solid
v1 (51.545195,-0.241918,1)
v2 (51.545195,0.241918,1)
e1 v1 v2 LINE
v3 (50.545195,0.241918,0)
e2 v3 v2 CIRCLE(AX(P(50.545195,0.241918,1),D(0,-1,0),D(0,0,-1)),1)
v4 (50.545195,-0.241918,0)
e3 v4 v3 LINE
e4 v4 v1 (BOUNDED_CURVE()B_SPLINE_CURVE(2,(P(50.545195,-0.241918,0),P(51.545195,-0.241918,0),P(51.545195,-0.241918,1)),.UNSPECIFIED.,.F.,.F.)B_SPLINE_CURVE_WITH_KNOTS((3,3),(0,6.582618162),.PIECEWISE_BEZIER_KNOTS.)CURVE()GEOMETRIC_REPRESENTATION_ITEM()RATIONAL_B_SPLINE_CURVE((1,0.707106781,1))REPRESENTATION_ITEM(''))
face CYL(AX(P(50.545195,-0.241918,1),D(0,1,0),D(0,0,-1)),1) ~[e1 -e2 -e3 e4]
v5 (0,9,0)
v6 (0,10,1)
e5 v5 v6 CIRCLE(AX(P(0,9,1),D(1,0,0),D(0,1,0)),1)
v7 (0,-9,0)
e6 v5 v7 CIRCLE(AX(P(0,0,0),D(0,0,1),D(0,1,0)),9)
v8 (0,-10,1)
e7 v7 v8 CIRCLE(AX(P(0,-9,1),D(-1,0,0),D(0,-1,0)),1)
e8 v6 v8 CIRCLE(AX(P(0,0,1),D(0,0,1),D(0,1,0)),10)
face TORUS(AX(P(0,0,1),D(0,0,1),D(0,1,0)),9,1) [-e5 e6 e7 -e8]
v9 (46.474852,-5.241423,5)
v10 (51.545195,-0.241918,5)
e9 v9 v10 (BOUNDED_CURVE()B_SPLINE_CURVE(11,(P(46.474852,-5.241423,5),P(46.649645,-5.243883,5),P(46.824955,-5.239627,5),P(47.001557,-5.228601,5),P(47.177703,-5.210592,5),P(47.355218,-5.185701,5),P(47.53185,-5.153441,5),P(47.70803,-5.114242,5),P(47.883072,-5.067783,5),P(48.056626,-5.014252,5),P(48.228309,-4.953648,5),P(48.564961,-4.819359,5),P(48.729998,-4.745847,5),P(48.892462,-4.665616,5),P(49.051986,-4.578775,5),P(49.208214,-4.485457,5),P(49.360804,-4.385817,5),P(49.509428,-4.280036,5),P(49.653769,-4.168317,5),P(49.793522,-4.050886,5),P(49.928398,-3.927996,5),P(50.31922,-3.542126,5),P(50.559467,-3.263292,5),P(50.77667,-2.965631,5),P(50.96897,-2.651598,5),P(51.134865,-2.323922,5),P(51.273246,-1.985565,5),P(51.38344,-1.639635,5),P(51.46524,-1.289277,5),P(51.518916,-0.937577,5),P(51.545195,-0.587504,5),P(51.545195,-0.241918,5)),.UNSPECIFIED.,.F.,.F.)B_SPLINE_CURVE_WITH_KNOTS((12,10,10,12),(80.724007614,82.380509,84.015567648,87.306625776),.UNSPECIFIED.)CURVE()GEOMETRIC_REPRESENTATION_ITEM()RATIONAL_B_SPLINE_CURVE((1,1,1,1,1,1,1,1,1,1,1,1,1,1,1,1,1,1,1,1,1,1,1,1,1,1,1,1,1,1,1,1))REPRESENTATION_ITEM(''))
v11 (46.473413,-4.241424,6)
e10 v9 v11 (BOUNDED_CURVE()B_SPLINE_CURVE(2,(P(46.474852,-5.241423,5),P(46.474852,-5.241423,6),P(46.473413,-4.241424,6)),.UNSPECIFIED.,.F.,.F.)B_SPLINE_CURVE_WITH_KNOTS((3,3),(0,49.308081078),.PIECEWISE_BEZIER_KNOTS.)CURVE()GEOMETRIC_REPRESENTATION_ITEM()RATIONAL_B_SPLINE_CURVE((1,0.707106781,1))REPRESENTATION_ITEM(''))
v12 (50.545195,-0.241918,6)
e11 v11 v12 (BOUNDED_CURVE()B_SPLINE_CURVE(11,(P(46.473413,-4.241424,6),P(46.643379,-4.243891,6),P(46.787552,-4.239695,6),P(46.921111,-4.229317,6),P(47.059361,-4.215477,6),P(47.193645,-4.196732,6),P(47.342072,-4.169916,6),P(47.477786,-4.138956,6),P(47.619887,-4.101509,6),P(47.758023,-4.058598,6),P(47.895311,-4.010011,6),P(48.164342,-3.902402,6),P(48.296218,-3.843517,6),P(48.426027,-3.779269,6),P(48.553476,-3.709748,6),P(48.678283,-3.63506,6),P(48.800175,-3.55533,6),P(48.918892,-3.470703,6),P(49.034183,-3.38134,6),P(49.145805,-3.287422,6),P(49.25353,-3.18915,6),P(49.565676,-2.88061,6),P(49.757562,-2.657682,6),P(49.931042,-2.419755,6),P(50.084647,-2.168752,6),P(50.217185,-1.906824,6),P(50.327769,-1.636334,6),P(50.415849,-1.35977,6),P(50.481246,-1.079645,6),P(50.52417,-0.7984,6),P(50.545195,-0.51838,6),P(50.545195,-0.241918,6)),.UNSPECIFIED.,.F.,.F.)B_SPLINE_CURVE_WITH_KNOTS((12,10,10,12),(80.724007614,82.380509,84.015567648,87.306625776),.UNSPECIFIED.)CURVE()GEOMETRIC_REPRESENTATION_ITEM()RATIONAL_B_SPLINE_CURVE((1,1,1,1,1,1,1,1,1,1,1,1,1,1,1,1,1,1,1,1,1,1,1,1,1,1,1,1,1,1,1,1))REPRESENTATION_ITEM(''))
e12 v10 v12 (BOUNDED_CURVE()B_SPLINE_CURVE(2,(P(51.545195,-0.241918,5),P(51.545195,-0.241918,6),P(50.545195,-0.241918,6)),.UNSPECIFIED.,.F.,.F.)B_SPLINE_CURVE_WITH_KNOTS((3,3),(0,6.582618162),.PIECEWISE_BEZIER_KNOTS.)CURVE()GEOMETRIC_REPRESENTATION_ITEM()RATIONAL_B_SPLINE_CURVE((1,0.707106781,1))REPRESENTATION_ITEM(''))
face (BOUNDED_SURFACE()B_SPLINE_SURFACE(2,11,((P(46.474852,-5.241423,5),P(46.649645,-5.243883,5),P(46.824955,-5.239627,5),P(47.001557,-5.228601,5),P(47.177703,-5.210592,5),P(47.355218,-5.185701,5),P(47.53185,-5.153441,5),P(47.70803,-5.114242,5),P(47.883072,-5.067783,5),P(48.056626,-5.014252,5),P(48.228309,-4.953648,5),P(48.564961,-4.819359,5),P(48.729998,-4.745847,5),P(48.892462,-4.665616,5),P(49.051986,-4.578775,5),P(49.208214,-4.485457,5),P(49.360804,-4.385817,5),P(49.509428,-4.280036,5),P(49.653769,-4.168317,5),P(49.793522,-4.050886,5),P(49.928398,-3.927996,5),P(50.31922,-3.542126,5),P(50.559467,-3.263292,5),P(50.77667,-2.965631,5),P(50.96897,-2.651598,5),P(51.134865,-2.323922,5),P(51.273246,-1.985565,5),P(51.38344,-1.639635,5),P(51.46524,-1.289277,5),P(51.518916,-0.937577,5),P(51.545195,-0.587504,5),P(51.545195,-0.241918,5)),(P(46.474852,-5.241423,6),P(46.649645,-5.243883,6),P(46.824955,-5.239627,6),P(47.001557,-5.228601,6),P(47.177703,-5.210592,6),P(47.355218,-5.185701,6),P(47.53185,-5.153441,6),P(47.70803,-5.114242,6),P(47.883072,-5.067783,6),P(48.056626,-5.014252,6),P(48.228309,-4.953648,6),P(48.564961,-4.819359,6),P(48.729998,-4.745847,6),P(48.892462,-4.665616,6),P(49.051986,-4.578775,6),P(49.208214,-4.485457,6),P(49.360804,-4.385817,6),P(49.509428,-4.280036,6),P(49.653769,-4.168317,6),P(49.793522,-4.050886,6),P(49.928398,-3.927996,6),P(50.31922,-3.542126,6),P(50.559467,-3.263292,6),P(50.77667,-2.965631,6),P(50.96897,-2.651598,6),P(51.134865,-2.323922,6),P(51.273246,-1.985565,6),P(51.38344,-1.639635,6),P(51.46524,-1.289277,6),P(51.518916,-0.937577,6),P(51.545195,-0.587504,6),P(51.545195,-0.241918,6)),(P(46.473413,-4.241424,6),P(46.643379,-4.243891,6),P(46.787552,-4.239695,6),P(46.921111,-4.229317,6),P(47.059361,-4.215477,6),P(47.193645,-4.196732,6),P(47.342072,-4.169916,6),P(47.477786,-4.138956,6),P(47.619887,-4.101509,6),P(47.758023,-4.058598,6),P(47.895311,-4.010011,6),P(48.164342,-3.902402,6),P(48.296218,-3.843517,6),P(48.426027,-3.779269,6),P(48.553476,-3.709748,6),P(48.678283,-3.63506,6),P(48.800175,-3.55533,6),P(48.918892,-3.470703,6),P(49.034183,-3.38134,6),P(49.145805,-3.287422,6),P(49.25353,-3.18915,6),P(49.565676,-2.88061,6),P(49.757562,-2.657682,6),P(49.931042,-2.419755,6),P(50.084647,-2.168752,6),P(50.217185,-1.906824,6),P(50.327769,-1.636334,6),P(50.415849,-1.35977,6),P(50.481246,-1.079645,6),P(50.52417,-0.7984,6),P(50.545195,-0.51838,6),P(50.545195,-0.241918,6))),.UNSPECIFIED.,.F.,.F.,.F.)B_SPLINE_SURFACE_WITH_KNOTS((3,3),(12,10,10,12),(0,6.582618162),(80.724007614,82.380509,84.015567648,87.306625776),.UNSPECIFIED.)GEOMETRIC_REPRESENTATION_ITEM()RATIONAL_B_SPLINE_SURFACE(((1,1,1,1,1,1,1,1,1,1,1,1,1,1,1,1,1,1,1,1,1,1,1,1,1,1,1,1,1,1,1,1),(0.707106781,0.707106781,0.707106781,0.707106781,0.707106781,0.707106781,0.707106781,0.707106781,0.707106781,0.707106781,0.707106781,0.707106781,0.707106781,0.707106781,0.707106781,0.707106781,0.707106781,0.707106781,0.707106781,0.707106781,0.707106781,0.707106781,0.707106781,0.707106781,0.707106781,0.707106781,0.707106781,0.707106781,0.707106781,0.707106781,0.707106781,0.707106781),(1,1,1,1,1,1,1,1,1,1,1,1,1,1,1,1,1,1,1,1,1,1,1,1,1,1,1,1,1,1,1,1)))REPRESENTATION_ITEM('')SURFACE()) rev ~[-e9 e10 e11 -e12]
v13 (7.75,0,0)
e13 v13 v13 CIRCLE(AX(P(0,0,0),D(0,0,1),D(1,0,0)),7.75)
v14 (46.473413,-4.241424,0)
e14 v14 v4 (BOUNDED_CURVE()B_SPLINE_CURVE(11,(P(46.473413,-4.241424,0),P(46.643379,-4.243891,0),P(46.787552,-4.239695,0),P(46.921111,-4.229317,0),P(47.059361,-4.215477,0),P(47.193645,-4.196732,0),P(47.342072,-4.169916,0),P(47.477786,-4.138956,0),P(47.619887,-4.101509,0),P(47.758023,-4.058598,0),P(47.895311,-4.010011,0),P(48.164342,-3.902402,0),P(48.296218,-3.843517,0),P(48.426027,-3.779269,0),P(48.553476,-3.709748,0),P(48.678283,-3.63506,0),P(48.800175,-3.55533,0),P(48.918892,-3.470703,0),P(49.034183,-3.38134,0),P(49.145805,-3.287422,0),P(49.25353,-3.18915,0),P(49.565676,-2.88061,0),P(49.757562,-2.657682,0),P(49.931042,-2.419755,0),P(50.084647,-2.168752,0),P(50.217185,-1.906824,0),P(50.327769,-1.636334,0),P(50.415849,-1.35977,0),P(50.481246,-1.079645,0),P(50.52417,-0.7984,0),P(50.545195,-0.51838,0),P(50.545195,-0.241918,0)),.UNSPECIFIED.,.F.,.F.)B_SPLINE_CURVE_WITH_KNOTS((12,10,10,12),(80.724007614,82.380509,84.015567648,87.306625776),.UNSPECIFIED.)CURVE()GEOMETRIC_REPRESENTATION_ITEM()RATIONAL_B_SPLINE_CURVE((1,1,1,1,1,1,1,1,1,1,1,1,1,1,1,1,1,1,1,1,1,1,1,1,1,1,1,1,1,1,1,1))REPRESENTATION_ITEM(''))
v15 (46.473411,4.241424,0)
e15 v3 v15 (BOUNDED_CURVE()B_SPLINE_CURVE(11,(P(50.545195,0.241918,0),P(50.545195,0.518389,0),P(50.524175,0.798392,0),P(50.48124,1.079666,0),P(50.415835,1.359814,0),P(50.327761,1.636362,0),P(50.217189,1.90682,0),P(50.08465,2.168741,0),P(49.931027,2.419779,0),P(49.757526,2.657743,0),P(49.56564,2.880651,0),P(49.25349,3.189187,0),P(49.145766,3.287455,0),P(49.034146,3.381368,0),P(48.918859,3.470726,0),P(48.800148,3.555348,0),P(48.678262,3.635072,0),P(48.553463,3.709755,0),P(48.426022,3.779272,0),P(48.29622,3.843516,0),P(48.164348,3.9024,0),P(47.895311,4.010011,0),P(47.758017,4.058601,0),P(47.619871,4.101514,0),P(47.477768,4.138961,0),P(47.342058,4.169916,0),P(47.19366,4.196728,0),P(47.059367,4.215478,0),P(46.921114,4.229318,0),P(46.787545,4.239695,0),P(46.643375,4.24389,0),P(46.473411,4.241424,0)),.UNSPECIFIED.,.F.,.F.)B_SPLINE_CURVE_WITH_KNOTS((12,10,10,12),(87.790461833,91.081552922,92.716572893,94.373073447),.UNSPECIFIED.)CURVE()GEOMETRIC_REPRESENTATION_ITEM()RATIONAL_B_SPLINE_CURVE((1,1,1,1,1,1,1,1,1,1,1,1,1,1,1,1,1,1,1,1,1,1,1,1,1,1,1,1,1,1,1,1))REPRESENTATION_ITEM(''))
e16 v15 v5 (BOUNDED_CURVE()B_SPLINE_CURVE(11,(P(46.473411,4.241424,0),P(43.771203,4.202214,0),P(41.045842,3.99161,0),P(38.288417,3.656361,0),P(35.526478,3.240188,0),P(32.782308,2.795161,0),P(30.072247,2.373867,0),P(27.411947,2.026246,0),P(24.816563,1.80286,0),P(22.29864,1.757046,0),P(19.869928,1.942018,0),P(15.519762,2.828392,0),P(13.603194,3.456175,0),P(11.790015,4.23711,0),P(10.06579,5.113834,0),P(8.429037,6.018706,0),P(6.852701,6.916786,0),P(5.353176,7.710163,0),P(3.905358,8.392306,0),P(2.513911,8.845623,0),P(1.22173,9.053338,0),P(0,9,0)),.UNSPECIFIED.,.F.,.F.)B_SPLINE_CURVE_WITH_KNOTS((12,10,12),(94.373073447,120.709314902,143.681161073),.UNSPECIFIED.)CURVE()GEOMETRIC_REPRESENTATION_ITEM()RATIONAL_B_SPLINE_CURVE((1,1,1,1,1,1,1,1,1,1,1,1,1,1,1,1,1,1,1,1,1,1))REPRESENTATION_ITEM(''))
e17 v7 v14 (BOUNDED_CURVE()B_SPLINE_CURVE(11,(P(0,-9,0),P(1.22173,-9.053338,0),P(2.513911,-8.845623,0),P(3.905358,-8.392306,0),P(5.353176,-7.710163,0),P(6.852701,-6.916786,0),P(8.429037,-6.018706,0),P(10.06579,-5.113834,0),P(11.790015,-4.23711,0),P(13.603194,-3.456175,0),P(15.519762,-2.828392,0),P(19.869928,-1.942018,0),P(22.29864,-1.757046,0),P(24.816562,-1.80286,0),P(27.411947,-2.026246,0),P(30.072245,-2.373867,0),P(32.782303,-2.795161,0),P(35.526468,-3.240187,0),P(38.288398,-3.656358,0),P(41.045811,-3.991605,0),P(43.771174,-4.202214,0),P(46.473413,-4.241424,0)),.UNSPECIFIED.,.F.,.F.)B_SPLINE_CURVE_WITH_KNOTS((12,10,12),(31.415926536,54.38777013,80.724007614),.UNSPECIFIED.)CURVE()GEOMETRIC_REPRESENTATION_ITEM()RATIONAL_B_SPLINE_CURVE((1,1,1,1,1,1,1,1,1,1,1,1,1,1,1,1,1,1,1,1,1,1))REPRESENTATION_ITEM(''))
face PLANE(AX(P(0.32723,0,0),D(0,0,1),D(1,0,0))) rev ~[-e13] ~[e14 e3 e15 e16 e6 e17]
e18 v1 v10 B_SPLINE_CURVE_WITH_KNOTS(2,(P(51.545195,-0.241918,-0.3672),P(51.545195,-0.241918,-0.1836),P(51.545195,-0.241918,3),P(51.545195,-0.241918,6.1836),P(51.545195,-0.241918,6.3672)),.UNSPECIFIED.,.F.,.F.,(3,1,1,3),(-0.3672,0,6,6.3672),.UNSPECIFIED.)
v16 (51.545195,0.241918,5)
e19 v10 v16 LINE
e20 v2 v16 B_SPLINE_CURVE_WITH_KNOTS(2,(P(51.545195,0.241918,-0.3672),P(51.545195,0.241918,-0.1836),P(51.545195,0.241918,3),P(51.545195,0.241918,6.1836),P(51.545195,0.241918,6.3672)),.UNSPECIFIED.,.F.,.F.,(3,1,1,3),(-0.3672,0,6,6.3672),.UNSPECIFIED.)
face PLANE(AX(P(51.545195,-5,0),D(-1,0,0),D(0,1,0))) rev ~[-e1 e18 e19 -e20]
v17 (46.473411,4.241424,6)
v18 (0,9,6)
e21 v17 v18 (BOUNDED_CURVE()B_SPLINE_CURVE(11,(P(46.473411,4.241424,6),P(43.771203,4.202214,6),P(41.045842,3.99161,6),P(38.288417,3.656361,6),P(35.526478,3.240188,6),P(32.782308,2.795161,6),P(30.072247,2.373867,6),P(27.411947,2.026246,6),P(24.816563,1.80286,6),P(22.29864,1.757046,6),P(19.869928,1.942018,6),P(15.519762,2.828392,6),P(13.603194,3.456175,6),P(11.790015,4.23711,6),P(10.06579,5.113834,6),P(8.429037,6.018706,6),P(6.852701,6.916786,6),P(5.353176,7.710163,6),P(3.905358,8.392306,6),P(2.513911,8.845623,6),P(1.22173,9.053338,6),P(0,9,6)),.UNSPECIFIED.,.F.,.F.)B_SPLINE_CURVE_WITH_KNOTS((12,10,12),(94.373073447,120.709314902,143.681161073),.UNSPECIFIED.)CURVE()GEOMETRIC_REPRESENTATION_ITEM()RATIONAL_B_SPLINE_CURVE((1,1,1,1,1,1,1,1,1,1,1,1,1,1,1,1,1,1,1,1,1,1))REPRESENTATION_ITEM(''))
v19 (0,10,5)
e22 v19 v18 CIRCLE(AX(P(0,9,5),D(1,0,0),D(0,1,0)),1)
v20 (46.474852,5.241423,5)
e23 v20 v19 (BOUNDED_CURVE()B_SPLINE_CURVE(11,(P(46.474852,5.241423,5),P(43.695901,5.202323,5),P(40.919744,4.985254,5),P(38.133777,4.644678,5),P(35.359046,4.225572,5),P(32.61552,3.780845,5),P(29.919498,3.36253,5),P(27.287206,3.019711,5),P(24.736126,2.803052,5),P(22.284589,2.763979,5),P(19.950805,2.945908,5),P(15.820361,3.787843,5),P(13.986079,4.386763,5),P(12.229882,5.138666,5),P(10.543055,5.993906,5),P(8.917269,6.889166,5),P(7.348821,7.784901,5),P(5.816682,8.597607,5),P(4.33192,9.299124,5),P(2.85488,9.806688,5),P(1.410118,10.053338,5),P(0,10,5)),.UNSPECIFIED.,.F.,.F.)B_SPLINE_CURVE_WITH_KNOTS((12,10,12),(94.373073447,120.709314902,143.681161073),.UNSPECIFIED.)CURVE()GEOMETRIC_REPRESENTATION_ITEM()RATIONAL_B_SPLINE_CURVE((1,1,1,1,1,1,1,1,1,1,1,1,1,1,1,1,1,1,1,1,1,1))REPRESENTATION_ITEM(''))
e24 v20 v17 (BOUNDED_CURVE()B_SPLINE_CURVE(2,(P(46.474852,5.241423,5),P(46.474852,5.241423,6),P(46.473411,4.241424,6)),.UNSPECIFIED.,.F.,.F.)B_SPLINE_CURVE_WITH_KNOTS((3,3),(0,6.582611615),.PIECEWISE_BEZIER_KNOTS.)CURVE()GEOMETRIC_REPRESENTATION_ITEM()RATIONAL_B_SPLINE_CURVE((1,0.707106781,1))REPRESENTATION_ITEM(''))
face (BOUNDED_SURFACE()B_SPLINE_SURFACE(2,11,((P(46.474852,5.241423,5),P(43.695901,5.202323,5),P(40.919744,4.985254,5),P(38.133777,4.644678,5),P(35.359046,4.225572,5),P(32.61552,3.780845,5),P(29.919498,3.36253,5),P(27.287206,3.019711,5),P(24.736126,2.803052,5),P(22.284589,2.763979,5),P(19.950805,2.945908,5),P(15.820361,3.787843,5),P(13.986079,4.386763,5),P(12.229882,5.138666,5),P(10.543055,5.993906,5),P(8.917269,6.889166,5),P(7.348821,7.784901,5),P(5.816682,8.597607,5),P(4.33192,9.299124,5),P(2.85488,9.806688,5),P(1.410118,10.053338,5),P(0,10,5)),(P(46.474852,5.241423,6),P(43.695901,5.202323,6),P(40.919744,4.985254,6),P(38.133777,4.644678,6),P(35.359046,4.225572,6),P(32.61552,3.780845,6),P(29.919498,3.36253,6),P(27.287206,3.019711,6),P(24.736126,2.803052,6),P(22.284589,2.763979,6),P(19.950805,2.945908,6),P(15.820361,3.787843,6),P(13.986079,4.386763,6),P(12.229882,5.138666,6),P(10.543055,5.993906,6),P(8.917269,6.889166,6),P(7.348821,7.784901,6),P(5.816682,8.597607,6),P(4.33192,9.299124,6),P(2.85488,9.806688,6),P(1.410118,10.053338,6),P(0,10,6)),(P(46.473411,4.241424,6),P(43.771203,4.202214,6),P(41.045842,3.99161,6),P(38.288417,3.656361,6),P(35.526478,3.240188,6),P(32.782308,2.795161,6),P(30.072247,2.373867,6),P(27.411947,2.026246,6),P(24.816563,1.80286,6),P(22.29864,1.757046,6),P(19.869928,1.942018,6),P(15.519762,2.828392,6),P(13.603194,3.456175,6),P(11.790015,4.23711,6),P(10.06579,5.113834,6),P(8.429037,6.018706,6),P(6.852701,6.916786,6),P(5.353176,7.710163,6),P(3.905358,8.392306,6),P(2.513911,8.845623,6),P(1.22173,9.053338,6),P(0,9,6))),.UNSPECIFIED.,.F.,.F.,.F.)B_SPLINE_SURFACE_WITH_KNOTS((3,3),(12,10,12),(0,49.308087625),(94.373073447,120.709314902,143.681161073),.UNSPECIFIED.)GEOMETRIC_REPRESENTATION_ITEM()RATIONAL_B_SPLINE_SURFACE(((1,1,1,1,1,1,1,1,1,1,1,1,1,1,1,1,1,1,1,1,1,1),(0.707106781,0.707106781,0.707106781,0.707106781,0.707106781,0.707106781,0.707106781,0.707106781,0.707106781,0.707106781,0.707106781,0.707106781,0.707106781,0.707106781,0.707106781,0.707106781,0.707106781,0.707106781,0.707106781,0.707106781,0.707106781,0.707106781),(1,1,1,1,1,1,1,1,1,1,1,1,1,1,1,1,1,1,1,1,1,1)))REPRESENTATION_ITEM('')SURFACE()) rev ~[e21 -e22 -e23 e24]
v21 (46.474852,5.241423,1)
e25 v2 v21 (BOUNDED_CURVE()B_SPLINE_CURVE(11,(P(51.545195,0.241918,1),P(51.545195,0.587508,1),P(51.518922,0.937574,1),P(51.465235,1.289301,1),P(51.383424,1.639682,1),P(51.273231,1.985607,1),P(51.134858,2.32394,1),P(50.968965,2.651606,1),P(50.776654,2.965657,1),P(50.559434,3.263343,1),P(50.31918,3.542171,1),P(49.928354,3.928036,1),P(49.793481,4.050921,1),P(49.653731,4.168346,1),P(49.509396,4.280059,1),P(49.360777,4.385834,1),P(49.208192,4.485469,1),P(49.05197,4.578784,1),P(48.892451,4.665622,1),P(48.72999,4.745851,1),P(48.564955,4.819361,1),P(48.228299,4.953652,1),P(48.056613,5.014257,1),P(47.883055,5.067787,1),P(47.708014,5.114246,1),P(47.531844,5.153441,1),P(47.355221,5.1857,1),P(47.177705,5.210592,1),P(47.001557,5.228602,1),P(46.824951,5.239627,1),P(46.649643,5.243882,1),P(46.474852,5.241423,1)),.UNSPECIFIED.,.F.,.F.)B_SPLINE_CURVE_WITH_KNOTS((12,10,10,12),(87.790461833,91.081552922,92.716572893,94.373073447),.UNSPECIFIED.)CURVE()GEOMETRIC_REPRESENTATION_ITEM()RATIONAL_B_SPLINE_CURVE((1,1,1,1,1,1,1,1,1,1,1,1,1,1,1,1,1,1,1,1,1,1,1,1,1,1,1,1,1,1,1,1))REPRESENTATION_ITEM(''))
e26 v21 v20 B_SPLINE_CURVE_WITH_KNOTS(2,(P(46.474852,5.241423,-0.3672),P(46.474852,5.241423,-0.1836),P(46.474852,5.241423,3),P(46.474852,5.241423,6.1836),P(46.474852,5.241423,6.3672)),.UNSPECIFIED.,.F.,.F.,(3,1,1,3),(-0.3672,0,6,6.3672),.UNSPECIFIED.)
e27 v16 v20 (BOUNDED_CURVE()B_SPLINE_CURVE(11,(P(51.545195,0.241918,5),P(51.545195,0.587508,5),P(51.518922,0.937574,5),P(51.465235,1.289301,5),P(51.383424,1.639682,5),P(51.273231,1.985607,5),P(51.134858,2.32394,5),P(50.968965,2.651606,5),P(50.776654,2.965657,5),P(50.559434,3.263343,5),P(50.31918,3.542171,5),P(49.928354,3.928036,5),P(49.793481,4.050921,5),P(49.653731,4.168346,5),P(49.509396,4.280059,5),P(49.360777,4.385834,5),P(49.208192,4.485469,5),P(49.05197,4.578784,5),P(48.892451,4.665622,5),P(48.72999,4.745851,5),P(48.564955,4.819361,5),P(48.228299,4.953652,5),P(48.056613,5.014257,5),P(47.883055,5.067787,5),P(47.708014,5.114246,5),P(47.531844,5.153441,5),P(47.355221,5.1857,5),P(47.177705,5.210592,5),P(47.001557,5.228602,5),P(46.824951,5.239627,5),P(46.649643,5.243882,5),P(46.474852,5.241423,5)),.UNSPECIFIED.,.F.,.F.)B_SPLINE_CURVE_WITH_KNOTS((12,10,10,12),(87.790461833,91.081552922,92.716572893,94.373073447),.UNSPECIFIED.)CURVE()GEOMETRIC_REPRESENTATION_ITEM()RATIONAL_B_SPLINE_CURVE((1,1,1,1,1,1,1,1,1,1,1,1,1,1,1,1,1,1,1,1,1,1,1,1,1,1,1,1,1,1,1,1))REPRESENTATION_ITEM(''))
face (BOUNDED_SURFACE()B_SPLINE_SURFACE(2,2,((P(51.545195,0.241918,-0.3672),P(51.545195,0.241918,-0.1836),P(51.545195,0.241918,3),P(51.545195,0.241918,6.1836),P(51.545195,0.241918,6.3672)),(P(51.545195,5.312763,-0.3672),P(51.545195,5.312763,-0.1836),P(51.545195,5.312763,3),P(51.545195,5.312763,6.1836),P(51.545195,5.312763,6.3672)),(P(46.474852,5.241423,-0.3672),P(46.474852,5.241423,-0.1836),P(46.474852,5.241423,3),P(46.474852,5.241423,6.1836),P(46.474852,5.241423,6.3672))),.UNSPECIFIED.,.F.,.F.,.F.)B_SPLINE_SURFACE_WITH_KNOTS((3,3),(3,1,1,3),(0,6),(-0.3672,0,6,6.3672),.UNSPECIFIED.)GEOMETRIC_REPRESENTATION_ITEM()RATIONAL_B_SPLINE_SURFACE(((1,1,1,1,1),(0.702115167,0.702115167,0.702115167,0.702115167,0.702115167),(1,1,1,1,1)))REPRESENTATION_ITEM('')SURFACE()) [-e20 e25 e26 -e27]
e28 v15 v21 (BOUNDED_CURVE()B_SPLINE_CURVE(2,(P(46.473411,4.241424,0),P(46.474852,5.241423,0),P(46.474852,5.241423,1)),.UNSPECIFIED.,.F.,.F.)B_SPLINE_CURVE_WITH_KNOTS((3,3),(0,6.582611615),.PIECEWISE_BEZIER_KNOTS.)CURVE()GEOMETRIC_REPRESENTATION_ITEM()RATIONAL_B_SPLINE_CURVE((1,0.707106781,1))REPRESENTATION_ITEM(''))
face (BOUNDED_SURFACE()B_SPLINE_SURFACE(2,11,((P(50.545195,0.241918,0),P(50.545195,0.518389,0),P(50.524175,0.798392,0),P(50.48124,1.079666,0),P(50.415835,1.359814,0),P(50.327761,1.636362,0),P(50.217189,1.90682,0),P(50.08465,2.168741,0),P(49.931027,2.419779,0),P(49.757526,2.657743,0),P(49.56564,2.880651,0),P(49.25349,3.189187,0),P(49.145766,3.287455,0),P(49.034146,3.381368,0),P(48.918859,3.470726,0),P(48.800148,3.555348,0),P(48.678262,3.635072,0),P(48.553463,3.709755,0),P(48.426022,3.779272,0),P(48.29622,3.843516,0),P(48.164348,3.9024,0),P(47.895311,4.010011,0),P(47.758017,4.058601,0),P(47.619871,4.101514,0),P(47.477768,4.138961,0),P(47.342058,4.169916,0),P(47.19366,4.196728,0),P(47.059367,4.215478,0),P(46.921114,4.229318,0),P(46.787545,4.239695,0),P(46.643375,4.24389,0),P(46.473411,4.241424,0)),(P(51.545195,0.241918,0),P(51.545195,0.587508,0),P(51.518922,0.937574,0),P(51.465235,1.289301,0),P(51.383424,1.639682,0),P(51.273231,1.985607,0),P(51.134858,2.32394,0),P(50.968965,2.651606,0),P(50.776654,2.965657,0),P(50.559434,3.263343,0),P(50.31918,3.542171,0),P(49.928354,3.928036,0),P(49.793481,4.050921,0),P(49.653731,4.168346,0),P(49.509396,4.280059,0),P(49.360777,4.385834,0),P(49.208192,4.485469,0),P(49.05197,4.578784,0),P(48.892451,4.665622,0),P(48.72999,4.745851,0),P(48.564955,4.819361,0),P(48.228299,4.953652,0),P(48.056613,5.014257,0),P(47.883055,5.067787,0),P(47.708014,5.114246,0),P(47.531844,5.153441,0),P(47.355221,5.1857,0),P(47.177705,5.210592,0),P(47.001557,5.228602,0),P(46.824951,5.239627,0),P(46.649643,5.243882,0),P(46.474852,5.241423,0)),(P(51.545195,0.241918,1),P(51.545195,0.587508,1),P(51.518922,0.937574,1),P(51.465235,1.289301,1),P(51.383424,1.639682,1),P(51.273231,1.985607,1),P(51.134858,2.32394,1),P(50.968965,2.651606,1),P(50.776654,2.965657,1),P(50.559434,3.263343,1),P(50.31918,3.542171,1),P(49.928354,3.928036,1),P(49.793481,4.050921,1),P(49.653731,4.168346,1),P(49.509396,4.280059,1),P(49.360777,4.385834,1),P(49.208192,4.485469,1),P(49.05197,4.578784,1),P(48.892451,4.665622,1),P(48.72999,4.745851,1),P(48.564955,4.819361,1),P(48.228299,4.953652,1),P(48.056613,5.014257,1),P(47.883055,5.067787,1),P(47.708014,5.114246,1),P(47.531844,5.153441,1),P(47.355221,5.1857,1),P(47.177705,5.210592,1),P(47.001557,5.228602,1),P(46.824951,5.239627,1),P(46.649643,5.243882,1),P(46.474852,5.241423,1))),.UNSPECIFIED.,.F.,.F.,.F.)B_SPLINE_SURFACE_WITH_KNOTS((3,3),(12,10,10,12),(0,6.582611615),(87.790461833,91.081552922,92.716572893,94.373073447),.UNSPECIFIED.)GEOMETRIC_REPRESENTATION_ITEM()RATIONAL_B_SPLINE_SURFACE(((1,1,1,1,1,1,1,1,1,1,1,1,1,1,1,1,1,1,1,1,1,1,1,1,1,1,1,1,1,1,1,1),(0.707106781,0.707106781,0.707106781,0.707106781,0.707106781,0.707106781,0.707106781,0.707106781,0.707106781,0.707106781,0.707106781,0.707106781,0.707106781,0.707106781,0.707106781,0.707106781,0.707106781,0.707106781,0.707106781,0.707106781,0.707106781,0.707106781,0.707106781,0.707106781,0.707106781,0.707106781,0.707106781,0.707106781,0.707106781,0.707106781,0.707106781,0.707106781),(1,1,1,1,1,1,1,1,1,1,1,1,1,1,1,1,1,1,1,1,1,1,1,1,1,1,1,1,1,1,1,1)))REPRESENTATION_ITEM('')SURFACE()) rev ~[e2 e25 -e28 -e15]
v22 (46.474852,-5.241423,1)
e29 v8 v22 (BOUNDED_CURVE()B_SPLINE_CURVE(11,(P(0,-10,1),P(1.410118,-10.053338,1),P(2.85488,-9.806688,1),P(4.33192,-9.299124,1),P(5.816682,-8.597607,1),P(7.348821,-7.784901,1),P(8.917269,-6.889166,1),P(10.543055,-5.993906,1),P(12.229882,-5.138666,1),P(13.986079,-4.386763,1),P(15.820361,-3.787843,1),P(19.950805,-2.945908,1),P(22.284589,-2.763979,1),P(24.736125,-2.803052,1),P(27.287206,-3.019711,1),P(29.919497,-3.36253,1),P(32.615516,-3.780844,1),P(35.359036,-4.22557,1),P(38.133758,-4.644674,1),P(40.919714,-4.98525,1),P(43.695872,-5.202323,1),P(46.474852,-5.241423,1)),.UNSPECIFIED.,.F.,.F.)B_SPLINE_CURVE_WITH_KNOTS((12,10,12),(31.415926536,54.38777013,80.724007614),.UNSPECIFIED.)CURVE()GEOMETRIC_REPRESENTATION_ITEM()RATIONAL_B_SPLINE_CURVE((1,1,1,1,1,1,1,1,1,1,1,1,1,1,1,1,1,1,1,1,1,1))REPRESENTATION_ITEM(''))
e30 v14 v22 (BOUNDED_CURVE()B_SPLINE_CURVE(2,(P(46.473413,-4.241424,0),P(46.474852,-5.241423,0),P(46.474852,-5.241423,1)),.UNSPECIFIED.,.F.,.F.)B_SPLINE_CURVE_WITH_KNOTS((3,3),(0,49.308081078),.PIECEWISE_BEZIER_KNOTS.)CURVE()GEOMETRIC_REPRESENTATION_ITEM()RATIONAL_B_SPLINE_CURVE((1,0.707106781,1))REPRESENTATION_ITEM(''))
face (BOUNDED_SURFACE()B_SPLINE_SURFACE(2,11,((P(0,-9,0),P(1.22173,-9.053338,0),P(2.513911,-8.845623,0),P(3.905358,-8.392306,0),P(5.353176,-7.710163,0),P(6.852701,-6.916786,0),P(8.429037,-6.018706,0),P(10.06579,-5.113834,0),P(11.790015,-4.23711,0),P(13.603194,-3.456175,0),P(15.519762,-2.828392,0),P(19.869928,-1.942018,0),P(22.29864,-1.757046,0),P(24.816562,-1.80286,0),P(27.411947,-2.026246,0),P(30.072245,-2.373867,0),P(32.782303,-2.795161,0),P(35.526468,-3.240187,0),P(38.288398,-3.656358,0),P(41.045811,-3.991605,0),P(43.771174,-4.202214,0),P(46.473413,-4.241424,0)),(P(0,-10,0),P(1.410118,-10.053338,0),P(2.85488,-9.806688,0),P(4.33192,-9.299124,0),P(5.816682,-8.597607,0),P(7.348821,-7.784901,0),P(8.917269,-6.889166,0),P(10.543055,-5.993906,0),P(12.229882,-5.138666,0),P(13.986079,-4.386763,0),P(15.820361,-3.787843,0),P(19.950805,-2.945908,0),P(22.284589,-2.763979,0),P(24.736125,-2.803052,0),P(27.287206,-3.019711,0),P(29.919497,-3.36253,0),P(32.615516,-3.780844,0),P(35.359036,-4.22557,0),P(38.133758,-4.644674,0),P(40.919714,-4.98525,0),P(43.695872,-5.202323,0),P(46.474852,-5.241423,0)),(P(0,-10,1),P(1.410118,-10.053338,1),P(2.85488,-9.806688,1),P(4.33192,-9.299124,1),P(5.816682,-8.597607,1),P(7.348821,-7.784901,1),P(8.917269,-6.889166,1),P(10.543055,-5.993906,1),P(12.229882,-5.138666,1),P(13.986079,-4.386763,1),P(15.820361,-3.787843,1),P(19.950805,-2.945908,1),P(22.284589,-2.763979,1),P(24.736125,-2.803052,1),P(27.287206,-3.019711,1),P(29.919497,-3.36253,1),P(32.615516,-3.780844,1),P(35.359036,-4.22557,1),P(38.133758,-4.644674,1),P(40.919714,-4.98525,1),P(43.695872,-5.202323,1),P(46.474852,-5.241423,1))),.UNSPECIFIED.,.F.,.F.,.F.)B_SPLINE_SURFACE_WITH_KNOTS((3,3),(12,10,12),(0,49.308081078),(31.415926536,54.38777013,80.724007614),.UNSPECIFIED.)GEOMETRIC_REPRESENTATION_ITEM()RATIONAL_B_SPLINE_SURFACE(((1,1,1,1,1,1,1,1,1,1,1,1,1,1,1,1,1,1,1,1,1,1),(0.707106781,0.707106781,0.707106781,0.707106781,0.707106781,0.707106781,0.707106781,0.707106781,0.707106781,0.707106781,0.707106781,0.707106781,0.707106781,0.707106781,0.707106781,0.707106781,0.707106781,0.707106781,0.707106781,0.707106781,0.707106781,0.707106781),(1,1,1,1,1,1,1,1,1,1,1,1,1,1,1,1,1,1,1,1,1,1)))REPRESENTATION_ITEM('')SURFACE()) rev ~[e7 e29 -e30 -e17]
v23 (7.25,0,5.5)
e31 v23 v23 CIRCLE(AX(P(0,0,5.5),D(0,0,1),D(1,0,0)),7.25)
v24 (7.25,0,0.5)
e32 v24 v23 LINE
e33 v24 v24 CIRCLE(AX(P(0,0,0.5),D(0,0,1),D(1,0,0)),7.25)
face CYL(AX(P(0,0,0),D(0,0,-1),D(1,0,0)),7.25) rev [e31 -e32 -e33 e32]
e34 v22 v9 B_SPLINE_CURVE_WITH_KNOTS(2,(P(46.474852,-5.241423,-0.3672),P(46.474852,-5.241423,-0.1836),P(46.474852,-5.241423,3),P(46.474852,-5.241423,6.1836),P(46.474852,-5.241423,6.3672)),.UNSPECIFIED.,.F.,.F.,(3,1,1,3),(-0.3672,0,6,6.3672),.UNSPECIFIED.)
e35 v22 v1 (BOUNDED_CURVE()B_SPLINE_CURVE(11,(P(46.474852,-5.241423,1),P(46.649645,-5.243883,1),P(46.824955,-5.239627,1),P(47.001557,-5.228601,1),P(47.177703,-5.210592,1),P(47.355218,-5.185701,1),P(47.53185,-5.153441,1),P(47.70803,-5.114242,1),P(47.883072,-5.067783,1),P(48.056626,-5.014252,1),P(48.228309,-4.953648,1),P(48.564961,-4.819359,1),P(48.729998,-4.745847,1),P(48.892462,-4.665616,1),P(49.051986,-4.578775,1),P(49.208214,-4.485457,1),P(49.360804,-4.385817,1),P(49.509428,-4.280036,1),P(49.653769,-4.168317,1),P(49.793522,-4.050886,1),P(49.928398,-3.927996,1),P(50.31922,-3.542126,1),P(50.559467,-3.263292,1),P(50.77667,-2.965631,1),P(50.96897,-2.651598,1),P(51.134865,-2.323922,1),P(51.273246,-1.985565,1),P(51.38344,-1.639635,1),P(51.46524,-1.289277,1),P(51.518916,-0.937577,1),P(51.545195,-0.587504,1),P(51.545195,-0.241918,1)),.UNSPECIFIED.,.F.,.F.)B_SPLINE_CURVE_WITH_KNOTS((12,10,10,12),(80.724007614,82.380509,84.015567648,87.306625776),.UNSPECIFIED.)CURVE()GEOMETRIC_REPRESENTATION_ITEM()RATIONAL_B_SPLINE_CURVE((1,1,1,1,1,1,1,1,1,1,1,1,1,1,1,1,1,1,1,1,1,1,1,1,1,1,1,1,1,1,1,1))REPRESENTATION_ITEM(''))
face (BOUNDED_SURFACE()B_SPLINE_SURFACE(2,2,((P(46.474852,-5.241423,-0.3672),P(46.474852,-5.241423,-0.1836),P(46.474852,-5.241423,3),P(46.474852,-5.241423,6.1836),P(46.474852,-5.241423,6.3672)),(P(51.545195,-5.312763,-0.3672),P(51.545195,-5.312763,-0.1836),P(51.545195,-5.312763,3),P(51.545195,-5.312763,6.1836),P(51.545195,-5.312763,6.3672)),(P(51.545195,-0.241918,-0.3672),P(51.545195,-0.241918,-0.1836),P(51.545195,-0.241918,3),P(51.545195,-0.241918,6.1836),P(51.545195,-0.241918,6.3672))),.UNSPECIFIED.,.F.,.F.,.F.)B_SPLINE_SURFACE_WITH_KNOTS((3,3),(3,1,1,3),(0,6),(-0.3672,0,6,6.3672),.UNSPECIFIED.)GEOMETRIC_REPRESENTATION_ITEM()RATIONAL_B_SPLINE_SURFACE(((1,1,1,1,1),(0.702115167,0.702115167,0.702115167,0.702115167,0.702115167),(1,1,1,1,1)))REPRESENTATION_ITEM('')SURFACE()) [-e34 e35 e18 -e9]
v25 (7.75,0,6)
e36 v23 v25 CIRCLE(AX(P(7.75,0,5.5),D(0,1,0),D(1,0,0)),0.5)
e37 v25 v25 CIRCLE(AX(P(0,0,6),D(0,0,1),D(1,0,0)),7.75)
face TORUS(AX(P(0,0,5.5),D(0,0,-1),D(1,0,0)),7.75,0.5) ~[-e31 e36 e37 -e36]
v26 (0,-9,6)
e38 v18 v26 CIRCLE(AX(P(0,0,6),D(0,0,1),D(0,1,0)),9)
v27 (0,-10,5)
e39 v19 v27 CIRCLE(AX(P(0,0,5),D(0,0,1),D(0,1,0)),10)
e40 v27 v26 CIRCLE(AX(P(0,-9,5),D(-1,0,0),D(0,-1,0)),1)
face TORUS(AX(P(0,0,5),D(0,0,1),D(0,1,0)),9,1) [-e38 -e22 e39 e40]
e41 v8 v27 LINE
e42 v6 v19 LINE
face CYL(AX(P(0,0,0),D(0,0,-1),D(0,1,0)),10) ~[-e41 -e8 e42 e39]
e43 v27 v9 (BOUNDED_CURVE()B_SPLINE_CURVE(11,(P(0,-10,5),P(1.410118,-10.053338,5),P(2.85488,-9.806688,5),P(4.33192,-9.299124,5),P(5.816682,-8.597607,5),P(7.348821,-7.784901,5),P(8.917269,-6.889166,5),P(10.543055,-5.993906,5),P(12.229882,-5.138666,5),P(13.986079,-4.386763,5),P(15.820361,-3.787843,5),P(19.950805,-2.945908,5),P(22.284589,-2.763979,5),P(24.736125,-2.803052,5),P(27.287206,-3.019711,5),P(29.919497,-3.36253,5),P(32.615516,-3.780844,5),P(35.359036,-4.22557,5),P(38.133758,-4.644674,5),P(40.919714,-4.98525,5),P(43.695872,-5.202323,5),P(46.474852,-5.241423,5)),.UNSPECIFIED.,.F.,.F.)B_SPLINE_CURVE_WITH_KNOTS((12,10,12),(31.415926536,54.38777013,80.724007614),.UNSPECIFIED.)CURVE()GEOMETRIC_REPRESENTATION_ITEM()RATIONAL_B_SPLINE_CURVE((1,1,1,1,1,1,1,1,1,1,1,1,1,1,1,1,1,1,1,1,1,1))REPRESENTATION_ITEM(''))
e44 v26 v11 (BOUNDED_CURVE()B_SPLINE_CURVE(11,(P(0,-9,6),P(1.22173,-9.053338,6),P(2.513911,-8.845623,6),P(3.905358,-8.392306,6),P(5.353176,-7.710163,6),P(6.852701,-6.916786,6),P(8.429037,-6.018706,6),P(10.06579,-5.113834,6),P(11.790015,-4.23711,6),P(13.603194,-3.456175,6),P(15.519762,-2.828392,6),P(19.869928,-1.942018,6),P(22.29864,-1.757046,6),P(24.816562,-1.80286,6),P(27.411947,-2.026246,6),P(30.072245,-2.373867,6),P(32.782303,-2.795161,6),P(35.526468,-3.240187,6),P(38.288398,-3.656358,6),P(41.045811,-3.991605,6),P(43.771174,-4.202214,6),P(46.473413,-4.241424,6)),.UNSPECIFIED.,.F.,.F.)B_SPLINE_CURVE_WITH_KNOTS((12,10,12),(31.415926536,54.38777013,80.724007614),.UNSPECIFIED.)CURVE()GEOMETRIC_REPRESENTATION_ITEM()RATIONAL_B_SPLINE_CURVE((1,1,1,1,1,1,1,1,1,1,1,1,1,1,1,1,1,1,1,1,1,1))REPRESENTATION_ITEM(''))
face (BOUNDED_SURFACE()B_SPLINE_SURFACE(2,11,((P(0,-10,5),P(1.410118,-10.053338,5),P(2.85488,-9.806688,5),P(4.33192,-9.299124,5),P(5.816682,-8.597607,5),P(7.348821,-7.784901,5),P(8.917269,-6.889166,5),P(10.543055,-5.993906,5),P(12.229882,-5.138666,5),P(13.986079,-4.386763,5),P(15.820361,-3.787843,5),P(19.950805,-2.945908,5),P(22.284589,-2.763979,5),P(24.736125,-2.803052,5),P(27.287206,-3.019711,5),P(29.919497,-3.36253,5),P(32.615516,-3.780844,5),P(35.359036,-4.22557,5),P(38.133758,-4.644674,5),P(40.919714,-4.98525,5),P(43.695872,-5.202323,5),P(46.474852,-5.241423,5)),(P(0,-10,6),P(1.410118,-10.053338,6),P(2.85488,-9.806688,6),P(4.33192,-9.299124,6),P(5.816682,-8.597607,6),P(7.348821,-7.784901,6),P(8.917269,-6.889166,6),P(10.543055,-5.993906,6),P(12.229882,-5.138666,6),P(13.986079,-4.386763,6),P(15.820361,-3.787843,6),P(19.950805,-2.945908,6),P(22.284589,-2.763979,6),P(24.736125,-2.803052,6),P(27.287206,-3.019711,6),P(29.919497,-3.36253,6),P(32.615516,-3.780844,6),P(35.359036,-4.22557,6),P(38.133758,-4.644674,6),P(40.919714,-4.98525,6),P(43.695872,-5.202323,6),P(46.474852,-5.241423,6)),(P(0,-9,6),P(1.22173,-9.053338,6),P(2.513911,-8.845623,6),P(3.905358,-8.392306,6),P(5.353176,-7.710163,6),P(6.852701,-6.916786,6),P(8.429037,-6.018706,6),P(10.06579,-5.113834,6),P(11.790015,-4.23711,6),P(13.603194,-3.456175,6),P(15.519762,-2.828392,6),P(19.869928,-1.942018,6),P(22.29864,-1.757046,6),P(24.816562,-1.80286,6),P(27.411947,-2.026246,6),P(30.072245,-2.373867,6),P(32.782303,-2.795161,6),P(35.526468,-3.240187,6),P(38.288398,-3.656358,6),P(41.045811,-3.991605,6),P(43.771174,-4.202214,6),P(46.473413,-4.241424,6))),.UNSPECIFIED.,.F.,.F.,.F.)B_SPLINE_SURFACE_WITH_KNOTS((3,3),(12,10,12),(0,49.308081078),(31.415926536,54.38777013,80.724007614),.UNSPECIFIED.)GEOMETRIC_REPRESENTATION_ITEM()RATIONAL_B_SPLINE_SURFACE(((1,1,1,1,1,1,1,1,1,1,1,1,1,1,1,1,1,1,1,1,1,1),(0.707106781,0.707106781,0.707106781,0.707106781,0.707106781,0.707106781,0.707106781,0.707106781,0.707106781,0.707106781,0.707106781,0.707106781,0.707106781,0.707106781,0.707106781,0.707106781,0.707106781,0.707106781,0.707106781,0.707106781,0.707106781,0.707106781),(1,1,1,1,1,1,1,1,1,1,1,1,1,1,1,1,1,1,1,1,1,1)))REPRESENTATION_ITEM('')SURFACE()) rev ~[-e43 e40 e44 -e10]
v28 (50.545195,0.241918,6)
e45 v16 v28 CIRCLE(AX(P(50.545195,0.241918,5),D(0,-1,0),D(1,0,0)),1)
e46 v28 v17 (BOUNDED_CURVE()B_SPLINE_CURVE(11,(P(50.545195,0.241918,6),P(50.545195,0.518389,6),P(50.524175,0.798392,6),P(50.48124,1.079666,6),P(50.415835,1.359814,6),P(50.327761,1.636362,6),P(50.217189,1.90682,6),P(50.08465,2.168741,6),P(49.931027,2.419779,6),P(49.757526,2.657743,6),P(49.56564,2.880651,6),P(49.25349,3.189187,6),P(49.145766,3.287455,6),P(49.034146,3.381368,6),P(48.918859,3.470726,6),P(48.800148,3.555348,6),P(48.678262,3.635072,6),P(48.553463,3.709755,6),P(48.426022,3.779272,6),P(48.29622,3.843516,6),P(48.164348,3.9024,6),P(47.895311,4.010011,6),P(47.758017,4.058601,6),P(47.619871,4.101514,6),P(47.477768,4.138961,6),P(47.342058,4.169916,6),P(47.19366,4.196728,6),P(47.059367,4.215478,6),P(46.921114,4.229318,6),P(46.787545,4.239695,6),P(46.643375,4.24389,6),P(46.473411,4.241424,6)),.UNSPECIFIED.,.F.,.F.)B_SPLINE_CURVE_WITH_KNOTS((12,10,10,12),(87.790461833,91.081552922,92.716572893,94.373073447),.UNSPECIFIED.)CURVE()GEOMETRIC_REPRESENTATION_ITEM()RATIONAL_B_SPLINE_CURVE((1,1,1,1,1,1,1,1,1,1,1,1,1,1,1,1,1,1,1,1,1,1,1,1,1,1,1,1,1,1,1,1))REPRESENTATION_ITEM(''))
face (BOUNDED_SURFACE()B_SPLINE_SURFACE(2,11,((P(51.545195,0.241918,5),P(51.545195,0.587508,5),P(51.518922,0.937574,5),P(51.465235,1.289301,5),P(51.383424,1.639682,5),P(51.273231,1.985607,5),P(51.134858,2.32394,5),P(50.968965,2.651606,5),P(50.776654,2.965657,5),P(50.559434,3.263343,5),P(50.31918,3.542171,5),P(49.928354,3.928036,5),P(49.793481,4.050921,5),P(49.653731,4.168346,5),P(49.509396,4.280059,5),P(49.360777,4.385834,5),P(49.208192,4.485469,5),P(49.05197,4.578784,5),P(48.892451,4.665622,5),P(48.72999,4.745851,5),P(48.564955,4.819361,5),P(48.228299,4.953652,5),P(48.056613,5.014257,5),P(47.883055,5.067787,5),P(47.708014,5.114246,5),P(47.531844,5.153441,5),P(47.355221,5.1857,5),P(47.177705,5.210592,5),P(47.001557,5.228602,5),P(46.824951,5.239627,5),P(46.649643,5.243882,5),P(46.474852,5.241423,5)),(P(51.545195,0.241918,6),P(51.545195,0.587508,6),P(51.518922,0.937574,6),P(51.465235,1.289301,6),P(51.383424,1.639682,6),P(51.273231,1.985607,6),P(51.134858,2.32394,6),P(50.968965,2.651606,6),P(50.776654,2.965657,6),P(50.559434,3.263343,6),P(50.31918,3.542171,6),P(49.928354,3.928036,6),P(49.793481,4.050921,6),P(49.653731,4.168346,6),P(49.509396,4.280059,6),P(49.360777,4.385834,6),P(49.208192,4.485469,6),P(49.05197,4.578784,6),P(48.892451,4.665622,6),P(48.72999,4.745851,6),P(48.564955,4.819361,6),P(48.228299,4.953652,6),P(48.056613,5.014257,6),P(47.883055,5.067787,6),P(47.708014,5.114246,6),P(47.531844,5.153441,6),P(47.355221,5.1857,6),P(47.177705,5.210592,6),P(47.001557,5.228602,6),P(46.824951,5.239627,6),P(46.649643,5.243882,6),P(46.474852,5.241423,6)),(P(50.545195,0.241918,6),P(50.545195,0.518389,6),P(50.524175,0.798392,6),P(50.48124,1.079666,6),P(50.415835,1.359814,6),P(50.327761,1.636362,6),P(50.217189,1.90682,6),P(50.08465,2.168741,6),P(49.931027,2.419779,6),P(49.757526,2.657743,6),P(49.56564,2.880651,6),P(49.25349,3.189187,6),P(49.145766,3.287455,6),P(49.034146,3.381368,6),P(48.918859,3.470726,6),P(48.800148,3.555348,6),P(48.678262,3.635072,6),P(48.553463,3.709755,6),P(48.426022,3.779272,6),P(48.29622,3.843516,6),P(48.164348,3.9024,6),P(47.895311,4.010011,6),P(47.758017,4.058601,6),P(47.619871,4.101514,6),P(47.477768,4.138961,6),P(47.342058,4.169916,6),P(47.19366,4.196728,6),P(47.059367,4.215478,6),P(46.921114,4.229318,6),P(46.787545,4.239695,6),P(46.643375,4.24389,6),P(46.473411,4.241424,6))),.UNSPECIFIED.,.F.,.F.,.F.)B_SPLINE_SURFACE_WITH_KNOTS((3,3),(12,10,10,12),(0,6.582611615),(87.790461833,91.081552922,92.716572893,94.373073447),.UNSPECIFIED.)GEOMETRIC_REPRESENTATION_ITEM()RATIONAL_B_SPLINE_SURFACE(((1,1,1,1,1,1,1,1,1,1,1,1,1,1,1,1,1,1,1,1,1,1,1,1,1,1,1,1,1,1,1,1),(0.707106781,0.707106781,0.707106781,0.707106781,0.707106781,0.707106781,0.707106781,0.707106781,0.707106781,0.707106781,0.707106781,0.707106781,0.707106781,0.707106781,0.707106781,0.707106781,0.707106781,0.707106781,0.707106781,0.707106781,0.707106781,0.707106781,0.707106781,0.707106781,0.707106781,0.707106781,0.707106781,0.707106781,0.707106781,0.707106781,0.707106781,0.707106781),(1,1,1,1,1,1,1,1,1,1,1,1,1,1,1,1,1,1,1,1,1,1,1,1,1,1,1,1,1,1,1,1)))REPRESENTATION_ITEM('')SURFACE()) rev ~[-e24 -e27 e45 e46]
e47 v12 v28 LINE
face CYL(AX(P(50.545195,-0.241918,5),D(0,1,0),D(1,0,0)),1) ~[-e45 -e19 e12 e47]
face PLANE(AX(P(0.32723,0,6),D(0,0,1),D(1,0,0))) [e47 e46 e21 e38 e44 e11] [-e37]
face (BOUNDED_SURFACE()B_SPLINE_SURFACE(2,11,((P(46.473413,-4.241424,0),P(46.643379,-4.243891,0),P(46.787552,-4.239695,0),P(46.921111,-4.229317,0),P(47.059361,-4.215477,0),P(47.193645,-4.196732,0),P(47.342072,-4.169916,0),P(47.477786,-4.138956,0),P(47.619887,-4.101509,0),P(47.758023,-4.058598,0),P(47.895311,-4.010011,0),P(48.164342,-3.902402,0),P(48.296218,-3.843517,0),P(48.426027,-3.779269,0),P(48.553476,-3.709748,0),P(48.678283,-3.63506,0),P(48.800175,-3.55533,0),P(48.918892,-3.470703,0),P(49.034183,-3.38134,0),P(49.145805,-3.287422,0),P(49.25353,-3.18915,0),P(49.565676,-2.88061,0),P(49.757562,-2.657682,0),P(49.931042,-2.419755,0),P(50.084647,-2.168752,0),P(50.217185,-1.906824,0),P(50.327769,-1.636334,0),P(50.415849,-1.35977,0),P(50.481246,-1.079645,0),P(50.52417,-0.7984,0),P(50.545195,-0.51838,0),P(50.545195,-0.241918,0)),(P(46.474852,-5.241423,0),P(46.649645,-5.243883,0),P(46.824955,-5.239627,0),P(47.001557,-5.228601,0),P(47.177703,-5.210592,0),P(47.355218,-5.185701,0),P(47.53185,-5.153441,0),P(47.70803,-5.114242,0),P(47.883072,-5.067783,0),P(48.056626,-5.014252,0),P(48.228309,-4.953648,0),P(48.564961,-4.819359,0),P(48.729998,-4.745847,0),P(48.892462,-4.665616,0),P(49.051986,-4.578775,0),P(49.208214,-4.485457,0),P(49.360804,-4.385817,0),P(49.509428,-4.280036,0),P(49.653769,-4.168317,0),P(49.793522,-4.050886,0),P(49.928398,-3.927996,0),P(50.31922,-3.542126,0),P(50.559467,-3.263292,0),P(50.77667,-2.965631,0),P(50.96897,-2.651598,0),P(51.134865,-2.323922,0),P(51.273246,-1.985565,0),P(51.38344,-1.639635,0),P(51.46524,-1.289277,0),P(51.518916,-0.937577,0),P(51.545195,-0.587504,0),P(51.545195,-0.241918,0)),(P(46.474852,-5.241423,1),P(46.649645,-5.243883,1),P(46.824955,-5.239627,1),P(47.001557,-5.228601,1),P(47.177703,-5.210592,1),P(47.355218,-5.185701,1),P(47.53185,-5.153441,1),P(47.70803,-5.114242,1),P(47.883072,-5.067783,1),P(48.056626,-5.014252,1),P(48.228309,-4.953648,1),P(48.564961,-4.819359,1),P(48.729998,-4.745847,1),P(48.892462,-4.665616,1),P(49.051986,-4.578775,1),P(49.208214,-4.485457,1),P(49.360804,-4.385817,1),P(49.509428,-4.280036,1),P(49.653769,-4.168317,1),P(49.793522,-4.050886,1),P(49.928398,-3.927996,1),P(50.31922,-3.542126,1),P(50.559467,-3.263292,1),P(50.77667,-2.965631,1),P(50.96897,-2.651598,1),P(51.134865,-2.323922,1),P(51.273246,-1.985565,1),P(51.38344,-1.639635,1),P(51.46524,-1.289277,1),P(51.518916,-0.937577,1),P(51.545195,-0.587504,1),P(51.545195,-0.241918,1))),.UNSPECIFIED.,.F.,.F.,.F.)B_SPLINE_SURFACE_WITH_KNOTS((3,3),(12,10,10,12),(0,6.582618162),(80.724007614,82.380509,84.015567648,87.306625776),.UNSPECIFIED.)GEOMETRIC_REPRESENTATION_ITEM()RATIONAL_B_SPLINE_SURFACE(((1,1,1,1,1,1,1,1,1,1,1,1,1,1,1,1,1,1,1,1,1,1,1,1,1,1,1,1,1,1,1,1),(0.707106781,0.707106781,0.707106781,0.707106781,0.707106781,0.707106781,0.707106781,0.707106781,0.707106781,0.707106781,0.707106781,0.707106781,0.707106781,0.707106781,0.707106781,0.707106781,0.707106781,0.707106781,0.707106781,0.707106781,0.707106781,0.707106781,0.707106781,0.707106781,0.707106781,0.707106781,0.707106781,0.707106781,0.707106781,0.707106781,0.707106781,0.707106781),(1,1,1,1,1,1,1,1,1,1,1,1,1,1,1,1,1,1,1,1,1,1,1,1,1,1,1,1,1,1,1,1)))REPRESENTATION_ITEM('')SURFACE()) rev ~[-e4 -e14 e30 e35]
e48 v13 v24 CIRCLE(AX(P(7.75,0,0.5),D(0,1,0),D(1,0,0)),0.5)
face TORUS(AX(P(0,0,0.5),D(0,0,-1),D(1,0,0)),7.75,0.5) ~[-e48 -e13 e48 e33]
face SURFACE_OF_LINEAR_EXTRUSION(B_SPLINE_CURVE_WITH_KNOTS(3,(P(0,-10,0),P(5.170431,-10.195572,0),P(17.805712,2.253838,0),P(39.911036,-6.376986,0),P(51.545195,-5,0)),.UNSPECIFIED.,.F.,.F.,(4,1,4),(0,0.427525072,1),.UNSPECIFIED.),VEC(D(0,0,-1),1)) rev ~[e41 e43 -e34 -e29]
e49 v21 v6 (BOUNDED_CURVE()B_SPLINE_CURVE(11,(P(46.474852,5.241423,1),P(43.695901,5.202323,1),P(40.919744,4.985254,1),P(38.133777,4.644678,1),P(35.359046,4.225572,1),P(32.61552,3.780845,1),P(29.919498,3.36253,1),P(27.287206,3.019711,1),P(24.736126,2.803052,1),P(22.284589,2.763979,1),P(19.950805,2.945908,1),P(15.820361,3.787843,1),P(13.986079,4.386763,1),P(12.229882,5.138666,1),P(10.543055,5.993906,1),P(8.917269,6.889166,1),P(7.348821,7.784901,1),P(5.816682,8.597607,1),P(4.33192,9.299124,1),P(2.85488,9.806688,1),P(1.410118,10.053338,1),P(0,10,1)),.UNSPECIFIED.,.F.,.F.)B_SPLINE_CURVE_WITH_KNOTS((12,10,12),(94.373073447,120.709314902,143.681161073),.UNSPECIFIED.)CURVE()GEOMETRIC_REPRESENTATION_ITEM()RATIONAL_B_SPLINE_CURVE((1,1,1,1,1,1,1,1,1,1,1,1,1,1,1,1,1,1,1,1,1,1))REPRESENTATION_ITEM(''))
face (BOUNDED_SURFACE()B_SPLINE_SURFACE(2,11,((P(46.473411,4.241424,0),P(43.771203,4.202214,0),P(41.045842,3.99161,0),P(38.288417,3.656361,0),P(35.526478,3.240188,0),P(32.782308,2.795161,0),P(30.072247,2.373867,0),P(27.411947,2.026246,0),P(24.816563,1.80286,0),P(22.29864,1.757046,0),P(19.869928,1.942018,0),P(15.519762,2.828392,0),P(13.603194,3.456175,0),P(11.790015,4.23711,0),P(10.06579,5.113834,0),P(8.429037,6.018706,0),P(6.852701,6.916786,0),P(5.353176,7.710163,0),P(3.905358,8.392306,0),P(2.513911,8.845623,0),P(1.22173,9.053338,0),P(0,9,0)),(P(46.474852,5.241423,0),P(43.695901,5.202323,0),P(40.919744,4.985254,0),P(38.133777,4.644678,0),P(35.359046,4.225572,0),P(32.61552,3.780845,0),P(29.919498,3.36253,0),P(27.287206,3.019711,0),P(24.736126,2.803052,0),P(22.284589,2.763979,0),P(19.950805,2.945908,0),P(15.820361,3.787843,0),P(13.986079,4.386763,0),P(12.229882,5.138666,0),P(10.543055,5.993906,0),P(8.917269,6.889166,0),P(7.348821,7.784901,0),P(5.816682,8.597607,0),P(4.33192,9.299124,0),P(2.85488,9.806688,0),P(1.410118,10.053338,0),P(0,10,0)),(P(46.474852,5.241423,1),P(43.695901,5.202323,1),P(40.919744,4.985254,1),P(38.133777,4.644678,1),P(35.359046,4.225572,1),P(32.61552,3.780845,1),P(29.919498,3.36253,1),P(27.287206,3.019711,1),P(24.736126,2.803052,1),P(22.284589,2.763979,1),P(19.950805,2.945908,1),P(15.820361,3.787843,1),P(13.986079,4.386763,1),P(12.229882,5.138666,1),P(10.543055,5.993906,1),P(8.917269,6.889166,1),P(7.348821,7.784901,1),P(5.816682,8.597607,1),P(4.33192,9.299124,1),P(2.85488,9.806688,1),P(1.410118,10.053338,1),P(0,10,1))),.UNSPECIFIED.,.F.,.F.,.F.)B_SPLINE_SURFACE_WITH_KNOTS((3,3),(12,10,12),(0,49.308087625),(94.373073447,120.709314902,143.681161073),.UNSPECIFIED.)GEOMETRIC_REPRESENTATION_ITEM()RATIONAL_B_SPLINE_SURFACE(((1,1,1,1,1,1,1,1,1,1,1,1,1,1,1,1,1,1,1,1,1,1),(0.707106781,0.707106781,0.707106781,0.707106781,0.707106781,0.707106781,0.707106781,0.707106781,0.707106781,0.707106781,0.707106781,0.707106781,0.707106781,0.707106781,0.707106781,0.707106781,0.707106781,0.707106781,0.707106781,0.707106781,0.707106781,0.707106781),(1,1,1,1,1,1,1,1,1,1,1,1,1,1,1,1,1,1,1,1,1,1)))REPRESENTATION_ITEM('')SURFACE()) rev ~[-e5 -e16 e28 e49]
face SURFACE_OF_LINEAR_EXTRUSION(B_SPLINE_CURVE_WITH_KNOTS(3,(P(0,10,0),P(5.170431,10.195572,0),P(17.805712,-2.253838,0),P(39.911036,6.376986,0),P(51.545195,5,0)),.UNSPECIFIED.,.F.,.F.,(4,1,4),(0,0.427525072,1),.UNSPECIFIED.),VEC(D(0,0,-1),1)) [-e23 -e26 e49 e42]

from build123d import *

# Parameters (mm, degrees)
F0_R     = 7.25
F1_DEPTH = 6
F2_R     = 5
F3_R     = 1
F4_R     = 0.5
F5_R     = 0.5


# Not quite as in the source:
# - a feature names something its author has since deleted; it is built from what else it names


with BuildPart() as f1:
    # F0 (on Top) → F1 (new body)
    with BuildSketch(Plane.XY):
        with BuildLine():
            ThreePointArc((0, -10), (7.0710678119, -7.0710678119), (10, 0))
            ThreePointArc((10, 0), (7.0710678119, 7.0710678119), (0, 10))
            ThreePointArc((0, 10), (-10, 0), (0, -10))
        make_face()
        Circle(F0_R, mode=Mode.SUBTRACT)
        with BuildLine():
            ThreePointArc((0, 10), (7.0710678119, 7.0710678119), (10, 0))
            ThreePointArc((10, 0), (7.0710678119, -7.0710678119), (0, -10))
            add(Edge.make_bspline(
                [(0, -10), (5.1704310233, -10.1955717475), (17.8057120766, 2.2538375417), (39.9110362514, -6.3769862775), (51.5451952815, -5)],
                knots=[0, 0, 0, 0, 0.4275250723, 1, 1, 1, 1], degree=3))
            Line((51.5451952815, -5), (51.5451952815, 5))
            add(Edge.make_bspline(
                [(0, 10), (5.1704310233, 10.1955717475), (17.8057120766, -2.2538375417), (39.9110362514, 6.3769862775), (51.5451952815, 5)],
                knots=[0, 0, 0, 0, 0.4275250723, 1, 1, 1, 1], degree=3))
        make_face()
    extrude(amount=F1_DEPTH)

    # F2
    f2_edges = [f1.edges().sort_by_distance(p)[0] for p in [
        (51.545195, -5, 3),
        (51.545195, 5, 3),
    ]]
    fillet(f2_edges, radius=F2_R)

    # F3
    f3_edges = [f1.edges().sort_by_distance(p)[0] for p in [
        (-10, 0, 6),
        (-10, 0, 0),
        (19.299517, -3.140676, 0),
        (19.299517, -3.140676, 6),
        (50.055771, -3.802235, 0),
        (51.545195, 0, 0),
        (19.299517, 3.140676, 0),
        (50.055771, 3.802235, 0),
        (50.055771, -3.802235, 6),
        (51.545195, 0, 6),
        (19.299517, 3.140676, 6),
        (50.055771, 3.802235, 6),
    ]]
    fillet(f3_edges, radius=F3_R)

    # F4
    f4_edges = [f1.edges().sort_by_distance(p)[0] for p in [
        (-7.25, 0, 0),
    ]]
    fillet(f4_edges, radius=F4_R)

    # F5
    f5_edges = [f1.edges().sort_by_distance(p)[0] for p in [
        (-7.25, 0, 6),
    ]]
    fillet(f5_edges, radius=F5_R)


solid = f1.part
